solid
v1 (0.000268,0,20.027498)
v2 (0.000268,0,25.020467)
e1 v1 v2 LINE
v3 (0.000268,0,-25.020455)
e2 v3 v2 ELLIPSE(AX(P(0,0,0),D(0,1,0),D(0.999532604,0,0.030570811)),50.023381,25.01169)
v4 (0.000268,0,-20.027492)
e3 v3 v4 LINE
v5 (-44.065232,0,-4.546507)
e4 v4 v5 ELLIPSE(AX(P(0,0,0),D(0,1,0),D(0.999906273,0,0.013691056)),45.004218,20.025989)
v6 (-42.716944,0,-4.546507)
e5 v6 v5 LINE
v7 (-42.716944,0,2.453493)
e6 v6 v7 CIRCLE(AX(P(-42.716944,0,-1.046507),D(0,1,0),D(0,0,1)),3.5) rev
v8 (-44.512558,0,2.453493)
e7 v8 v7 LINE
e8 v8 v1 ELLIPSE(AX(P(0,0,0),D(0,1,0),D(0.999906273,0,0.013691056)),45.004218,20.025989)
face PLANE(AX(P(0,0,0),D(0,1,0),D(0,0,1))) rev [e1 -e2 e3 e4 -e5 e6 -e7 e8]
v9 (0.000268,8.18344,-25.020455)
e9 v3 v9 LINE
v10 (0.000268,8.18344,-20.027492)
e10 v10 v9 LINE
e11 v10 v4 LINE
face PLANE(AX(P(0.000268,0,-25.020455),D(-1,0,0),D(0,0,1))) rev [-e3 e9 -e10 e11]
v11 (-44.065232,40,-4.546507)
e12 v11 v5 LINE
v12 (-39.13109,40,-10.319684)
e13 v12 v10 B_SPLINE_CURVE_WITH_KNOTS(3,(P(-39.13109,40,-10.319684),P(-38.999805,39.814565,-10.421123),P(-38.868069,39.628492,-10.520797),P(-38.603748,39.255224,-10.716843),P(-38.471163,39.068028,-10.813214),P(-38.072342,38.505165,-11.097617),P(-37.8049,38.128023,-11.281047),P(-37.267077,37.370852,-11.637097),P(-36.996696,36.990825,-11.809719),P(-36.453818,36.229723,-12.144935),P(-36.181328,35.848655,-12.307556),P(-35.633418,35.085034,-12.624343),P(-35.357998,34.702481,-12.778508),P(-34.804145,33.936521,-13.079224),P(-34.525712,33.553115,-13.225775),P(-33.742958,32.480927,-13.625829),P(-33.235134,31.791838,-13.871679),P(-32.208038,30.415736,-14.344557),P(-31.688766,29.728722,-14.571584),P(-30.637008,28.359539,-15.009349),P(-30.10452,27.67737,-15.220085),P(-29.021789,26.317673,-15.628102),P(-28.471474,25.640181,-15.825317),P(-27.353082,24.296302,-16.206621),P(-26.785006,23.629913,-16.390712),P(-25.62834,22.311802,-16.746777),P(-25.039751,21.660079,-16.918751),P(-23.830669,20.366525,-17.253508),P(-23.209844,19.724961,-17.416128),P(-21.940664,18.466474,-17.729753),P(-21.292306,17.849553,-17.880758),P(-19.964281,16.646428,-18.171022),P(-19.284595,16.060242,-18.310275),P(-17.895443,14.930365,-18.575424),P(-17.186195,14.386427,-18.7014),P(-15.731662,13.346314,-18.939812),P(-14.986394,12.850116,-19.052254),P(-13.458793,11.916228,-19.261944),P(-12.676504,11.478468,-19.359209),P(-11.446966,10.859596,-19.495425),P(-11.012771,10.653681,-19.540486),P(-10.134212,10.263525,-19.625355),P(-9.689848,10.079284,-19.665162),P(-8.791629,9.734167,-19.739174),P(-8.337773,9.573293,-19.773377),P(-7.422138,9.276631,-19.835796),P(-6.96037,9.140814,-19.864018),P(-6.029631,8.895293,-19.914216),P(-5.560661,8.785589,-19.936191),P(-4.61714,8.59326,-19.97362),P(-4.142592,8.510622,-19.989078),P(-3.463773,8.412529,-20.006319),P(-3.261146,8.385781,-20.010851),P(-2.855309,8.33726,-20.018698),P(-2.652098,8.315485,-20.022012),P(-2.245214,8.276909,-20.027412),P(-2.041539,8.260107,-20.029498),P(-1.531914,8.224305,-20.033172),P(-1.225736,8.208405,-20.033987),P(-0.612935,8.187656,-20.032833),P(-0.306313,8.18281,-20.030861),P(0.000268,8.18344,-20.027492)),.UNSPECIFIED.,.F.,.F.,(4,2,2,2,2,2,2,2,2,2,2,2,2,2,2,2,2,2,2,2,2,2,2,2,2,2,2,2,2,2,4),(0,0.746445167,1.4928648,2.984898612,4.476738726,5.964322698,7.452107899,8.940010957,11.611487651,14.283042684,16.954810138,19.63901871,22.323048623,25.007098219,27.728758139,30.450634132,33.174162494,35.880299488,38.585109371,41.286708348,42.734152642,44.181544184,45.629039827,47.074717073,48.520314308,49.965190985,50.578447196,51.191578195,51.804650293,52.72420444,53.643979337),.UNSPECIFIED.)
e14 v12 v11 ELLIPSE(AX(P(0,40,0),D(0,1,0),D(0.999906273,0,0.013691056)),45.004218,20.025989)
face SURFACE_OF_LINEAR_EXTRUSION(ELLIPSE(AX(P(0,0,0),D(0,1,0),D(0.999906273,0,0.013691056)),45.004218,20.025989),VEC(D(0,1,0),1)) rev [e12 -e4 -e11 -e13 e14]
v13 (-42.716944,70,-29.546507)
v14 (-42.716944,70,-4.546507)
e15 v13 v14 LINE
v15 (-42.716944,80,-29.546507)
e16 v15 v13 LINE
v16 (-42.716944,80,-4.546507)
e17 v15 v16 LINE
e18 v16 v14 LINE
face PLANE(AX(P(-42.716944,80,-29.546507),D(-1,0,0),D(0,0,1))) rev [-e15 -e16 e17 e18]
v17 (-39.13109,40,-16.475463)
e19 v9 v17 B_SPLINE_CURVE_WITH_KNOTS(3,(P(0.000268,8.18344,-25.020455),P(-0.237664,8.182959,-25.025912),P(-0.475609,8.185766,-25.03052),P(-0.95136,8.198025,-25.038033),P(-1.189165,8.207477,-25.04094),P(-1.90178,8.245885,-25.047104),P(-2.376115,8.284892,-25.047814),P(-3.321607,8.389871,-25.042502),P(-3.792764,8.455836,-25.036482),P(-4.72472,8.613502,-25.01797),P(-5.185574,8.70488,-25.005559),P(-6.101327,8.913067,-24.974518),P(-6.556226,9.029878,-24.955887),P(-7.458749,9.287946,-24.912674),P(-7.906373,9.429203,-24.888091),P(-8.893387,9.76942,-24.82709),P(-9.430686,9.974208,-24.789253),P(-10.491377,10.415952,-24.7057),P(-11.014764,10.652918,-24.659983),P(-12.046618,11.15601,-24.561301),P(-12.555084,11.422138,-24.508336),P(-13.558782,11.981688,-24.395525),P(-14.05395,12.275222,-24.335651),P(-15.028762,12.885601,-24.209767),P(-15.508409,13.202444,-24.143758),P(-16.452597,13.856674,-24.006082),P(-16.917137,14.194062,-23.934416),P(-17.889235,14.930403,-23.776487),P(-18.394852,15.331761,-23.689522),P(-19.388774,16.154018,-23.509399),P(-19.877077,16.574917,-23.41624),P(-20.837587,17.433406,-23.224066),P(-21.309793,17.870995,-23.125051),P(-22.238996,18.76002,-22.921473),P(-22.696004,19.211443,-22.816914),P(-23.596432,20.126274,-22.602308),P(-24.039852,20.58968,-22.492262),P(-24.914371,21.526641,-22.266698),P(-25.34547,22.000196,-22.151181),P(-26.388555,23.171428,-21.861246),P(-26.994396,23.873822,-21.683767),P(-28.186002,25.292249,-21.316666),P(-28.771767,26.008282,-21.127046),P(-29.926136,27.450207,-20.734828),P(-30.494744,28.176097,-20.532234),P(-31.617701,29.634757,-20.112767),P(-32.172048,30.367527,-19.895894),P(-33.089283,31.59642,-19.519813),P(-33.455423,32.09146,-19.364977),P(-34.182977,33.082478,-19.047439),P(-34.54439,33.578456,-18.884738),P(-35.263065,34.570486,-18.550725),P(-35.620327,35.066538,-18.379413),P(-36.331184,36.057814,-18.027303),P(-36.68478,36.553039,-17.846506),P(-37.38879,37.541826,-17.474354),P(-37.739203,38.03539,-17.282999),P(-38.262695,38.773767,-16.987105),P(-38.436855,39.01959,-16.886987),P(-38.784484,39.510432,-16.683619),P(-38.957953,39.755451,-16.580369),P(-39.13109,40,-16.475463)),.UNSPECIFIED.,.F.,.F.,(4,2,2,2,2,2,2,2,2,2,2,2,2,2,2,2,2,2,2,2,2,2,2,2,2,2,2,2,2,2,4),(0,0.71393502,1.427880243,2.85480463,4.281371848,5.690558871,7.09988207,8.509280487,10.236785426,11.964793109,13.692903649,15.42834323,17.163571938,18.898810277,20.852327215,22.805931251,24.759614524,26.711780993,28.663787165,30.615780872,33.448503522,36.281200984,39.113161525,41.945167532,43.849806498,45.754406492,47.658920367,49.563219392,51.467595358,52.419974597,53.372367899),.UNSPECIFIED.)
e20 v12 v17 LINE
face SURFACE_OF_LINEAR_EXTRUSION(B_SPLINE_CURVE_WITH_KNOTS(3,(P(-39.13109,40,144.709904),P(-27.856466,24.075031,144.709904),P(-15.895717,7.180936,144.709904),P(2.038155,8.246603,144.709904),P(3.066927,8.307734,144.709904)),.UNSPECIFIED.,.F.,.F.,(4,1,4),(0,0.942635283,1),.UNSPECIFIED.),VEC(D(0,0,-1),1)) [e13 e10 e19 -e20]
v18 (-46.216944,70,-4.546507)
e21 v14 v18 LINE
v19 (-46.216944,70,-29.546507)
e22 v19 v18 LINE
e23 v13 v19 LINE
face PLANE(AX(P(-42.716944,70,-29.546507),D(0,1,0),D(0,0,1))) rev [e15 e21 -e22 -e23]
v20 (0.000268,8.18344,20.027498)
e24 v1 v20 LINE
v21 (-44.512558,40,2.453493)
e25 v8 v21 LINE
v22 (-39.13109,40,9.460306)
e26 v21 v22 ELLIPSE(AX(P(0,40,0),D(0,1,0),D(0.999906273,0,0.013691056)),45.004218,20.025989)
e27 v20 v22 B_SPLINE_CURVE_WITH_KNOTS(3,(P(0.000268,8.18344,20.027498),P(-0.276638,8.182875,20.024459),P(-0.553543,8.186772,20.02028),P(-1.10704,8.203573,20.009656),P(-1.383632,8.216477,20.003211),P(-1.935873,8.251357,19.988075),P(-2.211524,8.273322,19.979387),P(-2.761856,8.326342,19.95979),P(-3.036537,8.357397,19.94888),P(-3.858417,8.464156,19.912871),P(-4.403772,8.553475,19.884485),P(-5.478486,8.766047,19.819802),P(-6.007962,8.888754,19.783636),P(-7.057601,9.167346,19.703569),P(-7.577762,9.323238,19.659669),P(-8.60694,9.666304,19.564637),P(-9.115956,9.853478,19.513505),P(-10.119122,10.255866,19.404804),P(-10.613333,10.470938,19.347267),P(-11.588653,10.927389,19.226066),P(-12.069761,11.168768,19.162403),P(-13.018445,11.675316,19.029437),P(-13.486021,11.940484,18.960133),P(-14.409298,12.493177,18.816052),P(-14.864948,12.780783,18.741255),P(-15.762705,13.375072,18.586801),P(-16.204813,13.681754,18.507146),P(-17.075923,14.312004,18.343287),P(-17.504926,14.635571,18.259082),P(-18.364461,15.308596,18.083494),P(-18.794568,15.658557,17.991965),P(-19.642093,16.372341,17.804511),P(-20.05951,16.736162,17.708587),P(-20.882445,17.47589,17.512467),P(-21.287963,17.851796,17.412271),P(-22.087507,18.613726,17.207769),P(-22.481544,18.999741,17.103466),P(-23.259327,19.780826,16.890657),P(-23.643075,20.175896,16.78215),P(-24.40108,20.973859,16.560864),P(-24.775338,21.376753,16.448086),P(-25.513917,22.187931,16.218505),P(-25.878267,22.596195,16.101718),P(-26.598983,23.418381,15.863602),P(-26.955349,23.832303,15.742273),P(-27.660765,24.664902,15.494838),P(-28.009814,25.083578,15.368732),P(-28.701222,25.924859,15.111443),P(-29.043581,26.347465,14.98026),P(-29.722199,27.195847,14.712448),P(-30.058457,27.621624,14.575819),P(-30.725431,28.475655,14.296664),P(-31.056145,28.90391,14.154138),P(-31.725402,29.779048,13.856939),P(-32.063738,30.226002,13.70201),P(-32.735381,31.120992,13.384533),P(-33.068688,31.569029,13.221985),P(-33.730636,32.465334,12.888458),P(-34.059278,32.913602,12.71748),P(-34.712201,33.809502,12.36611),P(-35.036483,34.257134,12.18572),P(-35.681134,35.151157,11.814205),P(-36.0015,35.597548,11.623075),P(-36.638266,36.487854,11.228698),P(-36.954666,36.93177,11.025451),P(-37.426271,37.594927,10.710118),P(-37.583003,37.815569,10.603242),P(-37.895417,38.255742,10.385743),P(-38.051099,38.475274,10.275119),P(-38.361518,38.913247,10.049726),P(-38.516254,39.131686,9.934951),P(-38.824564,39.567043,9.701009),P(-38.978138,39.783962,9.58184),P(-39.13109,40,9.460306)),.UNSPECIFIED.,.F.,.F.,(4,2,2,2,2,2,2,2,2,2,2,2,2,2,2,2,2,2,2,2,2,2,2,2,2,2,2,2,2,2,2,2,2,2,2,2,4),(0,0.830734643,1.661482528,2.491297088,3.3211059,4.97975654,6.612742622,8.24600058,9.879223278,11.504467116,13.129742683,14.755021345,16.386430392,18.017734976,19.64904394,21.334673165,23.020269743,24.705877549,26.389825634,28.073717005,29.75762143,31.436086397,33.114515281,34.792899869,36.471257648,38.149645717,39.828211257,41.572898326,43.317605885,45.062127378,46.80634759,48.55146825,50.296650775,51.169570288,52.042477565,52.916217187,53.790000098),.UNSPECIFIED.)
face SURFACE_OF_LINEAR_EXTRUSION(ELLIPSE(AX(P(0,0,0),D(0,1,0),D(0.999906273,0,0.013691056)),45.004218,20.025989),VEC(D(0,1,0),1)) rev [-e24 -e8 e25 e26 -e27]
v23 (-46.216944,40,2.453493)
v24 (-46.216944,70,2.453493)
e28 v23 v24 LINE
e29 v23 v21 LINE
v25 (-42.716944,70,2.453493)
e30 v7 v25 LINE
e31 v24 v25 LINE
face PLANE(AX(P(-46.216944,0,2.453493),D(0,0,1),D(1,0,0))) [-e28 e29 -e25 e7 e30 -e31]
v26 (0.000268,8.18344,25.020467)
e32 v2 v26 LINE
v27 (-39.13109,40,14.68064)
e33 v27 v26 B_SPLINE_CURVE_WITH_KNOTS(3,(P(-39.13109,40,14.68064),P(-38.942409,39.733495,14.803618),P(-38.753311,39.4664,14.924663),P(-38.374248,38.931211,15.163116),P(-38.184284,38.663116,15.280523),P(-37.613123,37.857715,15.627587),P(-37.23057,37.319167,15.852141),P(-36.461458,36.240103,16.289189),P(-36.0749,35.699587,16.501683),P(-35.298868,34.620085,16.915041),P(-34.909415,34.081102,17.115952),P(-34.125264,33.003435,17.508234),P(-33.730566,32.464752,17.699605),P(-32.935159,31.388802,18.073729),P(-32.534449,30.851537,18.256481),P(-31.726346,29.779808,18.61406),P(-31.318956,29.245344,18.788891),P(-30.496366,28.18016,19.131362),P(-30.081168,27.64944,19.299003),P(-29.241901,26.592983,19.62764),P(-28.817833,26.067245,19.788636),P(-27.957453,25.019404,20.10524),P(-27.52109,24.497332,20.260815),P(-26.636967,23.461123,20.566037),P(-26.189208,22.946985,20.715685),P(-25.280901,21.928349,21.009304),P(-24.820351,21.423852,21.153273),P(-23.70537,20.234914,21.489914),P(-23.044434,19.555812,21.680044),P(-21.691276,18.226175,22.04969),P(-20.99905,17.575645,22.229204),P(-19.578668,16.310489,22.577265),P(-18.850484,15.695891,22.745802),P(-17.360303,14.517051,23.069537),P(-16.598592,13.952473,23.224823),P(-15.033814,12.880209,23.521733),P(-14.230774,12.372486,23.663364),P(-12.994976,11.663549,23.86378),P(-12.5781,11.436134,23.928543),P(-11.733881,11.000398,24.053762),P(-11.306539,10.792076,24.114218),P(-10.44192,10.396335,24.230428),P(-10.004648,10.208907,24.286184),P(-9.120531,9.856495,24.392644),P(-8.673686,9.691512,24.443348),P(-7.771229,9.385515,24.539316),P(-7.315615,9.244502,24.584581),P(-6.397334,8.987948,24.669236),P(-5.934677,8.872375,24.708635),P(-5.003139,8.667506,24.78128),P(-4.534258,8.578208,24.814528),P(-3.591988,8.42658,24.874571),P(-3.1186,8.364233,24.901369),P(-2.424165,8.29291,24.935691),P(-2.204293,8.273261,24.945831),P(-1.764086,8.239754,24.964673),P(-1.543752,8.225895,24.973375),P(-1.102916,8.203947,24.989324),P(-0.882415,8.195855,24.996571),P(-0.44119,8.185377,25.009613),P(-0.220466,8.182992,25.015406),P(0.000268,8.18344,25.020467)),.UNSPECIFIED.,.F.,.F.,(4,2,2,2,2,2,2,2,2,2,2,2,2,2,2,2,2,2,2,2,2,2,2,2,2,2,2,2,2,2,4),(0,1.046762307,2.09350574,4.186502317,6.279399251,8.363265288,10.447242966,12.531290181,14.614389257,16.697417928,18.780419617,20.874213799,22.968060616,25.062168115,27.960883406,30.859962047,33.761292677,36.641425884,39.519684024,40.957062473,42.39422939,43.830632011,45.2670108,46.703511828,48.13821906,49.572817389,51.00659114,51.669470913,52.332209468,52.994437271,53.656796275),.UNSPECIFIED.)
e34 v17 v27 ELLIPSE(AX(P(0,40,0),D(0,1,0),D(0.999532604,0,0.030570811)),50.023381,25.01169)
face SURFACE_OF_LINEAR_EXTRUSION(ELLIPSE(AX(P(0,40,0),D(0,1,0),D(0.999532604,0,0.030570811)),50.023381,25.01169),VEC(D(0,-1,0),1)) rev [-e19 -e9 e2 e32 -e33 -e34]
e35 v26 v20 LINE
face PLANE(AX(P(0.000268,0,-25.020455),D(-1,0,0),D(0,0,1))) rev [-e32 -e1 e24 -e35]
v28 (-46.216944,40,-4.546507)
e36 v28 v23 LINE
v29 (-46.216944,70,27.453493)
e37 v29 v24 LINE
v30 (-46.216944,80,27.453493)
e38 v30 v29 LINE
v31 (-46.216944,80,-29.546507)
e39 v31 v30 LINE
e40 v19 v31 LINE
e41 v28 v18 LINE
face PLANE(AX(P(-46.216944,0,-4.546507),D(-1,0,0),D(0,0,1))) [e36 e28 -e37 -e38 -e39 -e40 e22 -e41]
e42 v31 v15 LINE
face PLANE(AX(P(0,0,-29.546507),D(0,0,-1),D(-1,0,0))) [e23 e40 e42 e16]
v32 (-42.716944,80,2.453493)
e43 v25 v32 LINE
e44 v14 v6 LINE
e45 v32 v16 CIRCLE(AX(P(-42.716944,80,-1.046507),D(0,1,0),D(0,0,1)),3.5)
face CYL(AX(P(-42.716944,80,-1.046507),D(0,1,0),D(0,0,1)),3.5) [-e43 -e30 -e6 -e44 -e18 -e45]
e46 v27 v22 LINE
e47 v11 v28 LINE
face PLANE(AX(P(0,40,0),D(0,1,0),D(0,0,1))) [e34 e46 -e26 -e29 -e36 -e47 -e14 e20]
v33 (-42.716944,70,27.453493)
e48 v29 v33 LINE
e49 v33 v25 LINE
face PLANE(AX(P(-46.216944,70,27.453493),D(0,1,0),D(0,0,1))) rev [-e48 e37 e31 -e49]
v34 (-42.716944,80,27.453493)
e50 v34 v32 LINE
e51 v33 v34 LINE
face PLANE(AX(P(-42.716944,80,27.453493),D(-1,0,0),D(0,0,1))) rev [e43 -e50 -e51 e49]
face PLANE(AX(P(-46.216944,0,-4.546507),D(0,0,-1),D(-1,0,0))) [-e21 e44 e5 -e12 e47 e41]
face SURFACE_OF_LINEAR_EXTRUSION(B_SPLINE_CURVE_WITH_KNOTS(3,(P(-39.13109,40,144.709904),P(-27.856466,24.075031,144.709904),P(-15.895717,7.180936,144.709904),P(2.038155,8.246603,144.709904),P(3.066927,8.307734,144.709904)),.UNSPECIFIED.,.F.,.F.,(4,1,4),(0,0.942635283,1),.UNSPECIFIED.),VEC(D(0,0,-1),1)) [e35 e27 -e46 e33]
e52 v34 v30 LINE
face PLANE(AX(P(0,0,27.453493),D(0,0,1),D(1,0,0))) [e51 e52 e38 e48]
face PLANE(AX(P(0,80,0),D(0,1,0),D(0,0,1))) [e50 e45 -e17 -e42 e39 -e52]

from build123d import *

# Parameters (mm, degrees)
SKETCH1_RX          = 50.023380752
SKETCH1_RY          = 25.011690376
BOSS_EXTRUDE1_DEPTH = 40
SKETCH2_W           = 53.048194423
SKETCH2_H           = 52.128277272
CUT_EXTRUDE1_DEPTH  = 40
SKETCH3_RX          = 45.004218106
SKETCH3_RY          = 20.025989305
CUT_EXTRUDE3_DEPTH  = 40
HANDLE_DEPTH        = 40
HANDLE_DEPTH_BACK   = 40
SKETCH4_W           = 7
SKETCH4_H           = 7
CUT_EXTRUDE4_START  = -27.500221438
CUT_EXTRUDE4_DEPTH  = 50.067195632
FILLET1_RADIUS      = 3.5
FILLET1_LENGTH      = 80
SKETCH6_W           = 3.5
SKETCH6_H           = 10
BOSS_EXTRUDE2_DEPTH = 25
SKETCH9_W           = 3.5
SKETCH9_H           = 10
BOSS_EXTRUDE3_DEPTH = 25


# Read off the part's stored shape, not the designer's step: Cut-Extrude4
with BuildPart() as part:
    # Sketch1 → Boss-Extrude1 (new body)
    with BuildSketch(Plane(origin=(0, 0, 0), x_dir=(1, 0, 0), z_dir=(0, 1, 0))):
        with Locations(Location((0, 0), (0, 0, -1.751851392))):
            Ellipse(SKETCH1_RX, SKETCH1_RY)
    extrude(amount=BOSS_EXTRUDE1_DEPTH)

    # Sketch2 → Cut-Extrude1 (cut)
    with BuildSketch(Plane(origin=(0, 40, 0), x_dir=(1, 0, 0), z_dir=(0, 1, 0))):
        with Locations((26.524365297, -1.043684065)):
            Rectangle(SKETCH2_W, SKETCH2_H)
    extrude(amount=-CUT_EXTRUDE1_DEPTH, mode=Mode.SUBTRACT)

    # Sketch3 → Cut-Extrude3 (cut)
    with BuildSketch(Plane(origin=(0, 40, 0), x_dir=(1, 0, 0), z_dir=(0, 1, 0))):
        with Locations(Location((0, 0), (0, 0, -0.784464251))):
            Ellipse(SKETCH3_RX, SKETCH3_RY)
    extrude(amount=-CUT_EXTRUDE3_DEPTH, mode=Mode.SUBTRACT)

    # Sketch4 → handle (add, two sides: drawn at the far end of the back side and taken through both)
    with BuildSketch(Plane(origin=(1.890919535, 40, 0), x_dir=(1, 0, 0), z_dir=(0, 1, 0)).offset(-HANDLE_DEPTH_BACK)):
        with Locations((-44.607863545, 1.046507327)):
            Rectangle(SKETCH4_W, SKETCH4_H)
    extrude(amount=HANDLE_DEPTH + HANDLE_DEPTH_BACK)

    # Cut-Extrude4 outline → Cut-Extrude4 (cut)
    with BuildSketch(Plane(origin=(1.890919535, 0, 2.453492673), x_dir=(1, 0, 0), z_dir=(0, 0, 1)).offset(CUT_EXTRUDE4_START)):
        with BuildLine():
            Line((-1.89065145, 40), (-41.022009989, 40))
            add(Edge.make_bspline(
                [(-41.022009989, 40), (-29.747385861, 24.075030507), (-18.472761733, 8.150061014), (-1.89065145, 8.183439673)],
                knots=[0, 0, 0, 0, 0.942635283, 0.942635283, 0.942635283, 0.942635283], degree=3))
            Line((-1.89065145, 8.183439673), (-1.89065145, 40))
        make_face()
    extrude(amount=CUT_EXTRUDE4_DEPTH, mode=Mode.SUBTRACT)

    # Fillet1: full round fillet: the end face becomes a half cylinder, R = half its width
    fillet1_face = Plane((-39.21694401, 40, -1.046507327), x_dir=(0, 1, 0), z_dir=(1, 0, 0))  # on the end face: x along it, z out of the body
    fillet1_slab = fillet1_face.offset(-FILLET1_RADIUS / 2) * Box(FILLET1_LENGTH, 2 * FILLET1_RADIUS, FILLET1_RADIUS, mode=Mode.PRIVATE)  # the body's end, R deep
    fillet1_round = Plane((-42.71694401, 40, -1.046507327), x_dir=(1, 0, 0), z_dir=(0, 1, 0)) * Cylinder(FILLET1_RADIUS, FILLET1_LENGTH, mode=Mode.PRIVATE)  # its axis R under the face
    add(fillet1_slab - fillet1_round, mode=Mode.SUBTRACT)

    # Sketch6 → Boss-Extrude2 (add)
    with BuildSketch(Plane.XY.offset(2.453492673)):
        with Locations((-44.46694401, 75)):
            Rectangle(SKETCH6_W, SKETCH6_H)
    extrude(amount=BOSS_EXTRUDE2_DEPTH)

    # Sketch9 → Boss-Extrude3 (add)
    with BuildSketch(Plane(origin=(0, 0, -4.546507327), x_dir=(-1, 0, 0), z_dir=(0, 0, -1))):
        with Locations((44.46694401, 75)):
            Rectangle(SKETCH9_W, SKETCH9_H)
    extrude(amount=BOSS_EXTRUDE3_DEPTH)


solid = part.part
